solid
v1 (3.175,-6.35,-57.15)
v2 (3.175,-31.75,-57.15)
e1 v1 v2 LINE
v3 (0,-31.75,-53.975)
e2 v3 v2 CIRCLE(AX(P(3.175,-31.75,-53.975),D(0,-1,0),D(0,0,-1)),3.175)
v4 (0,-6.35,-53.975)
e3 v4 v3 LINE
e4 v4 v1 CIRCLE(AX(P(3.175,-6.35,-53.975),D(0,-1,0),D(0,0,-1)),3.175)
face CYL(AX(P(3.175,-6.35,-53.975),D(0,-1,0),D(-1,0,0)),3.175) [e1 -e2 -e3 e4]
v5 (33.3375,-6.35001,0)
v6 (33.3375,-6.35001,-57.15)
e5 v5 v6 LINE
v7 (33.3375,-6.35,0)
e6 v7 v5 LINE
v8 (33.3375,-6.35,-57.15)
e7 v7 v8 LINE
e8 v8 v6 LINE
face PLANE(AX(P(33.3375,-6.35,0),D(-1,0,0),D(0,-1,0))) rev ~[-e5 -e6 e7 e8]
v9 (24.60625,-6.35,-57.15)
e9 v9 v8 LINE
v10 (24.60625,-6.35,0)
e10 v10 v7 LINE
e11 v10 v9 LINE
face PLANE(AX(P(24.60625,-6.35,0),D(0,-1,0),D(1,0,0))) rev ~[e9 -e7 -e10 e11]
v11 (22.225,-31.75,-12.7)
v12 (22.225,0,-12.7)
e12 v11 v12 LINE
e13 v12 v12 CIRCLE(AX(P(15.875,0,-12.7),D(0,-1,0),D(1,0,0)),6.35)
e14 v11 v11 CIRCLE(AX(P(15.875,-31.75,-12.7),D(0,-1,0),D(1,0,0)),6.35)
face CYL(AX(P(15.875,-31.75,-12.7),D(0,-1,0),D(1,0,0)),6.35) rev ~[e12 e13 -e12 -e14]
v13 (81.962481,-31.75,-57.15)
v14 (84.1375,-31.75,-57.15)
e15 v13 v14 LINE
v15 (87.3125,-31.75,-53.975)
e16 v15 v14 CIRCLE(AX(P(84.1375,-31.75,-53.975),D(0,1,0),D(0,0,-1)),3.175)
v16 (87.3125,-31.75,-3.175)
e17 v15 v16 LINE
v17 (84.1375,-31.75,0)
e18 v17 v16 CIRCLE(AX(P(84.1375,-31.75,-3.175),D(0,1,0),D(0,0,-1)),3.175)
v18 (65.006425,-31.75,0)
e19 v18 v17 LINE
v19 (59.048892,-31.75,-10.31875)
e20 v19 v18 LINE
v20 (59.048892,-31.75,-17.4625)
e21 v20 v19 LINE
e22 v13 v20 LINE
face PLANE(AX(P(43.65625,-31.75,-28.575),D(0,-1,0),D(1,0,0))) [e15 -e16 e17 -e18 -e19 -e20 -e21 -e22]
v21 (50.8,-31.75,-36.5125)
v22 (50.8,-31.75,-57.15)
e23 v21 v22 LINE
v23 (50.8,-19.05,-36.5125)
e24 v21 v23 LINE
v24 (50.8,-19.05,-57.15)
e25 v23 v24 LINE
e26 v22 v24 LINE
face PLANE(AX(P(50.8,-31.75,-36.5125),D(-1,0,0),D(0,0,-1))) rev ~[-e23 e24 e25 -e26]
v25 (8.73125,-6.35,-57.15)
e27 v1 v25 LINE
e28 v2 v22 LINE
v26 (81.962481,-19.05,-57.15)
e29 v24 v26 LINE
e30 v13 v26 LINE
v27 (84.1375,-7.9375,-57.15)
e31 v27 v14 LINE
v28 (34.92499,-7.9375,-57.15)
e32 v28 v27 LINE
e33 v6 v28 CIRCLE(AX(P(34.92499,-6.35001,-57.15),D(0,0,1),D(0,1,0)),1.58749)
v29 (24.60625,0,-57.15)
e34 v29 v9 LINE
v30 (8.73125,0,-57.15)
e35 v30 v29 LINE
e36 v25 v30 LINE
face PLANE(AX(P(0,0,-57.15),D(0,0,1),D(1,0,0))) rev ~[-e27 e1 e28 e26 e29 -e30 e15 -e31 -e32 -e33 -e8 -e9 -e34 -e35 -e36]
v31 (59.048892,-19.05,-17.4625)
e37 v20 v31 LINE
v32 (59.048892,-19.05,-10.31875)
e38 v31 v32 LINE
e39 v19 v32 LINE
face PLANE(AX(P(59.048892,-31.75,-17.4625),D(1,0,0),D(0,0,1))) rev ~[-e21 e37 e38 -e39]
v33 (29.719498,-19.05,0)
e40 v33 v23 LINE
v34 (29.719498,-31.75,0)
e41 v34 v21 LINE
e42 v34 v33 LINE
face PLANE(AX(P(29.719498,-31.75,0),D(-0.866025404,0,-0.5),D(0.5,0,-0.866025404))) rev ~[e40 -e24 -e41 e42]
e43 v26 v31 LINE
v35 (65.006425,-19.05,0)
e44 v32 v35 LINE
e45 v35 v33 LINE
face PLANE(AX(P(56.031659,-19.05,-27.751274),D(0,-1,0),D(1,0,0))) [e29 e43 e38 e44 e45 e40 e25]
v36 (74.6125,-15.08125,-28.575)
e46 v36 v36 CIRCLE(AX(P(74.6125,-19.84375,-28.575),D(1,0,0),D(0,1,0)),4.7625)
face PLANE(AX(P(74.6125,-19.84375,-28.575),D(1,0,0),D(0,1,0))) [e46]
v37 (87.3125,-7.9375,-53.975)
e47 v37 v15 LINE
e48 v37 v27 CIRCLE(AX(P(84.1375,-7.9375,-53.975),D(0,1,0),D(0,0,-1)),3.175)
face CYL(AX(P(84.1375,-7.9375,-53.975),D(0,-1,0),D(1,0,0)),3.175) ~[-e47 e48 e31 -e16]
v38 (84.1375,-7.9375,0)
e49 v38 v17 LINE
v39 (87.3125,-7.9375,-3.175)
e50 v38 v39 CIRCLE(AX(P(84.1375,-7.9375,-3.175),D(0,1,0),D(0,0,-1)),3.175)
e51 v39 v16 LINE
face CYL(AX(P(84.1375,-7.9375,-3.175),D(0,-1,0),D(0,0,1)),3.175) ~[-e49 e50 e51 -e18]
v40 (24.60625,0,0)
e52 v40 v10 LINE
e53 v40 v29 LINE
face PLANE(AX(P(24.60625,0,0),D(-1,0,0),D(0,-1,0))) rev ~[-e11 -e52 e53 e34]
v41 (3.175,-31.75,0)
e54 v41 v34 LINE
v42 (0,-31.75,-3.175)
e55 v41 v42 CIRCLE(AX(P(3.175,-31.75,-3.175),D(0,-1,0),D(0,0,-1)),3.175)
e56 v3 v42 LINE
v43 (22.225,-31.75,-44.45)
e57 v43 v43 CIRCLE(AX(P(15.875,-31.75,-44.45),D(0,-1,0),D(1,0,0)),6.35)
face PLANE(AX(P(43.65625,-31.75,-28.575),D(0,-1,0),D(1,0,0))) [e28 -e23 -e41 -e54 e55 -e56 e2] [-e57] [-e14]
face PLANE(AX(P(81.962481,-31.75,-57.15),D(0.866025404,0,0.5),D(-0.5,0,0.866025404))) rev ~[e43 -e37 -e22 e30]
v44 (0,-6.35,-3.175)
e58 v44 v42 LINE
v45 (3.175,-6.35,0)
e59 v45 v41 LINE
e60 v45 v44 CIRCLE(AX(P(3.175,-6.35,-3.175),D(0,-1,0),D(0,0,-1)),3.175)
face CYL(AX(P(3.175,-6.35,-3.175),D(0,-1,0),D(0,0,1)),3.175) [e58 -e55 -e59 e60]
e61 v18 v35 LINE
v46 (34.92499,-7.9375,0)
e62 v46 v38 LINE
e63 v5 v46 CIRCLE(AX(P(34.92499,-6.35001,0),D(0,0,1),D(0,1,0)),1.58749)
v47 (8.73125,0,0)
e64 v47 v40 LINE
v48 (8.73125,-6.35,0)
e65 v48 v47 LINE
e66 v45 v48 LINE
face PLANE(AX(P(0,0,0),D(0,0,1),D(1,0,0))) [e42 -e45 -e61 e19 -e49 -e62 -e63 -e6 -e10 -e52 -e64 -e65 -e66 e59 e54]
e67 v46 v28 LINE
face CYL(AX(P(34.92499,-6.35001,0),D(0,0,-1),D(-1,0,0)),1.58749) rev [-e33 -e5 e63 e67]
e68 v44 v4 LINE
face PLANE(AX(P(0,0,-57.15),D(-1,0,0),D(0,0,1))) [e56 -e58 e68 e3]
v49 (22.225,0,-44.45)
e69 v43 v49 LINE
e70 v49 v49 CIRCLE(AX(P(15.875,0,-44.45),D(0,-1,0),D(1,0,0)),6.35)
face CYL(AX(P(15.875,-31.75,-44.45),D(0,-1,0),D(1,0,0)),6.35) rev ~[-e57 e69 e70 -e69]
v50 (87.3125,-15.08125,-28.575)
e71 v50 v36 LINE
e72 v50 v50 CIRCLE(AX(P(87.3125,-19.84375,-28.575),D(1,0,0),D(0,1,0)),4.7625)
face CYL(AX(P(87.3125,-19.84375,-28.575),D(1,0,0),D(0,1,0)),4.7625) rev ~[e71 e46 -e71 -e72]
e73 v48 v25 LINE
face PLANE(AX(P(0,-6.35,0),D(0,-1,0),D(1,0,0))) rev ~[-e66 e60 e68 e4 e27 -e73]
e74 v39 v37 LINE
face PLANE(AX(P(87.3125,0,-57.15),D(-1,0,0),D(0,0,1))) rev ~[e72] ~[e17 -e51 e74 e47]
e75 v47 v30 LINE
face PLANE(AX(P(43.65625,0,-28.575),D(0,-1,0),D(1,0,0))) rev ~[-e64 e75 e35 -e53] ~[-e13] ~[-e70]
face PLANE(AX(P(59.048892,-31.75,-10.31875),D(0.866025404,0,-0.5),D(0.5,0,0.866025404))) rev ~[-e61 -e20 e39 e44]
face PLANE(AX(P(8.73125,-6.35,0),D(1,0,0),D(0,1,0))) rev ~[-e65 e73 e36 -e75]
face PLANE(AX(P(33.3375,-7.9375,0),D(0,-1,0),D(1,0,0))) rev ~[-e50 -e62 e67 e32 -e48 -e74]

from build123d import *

# Parameters (mm, degrees)
F0_W      = 87.3125
F0_H      = 57.15
F1_DEPTH  = 31.75
F3_DEPTH  = 12.7
F4_W      = 8.73125
F4_H      = 6.35
F5_DEPTH  = 66.294
F6_R      = 1.58749
F7_R      = 3.175
F8_R      = 6.35
F9_DEPTH  = 108.204
F10_R     = 4.7625
F11_DEPTH = 12.7


# Not quite as in the source:
# - a fillet or chamfer is up to 0.001 mm smaller than in the source, because OpenCascade refuses the exact size


with BuildPart() as f1:
    # F0 (on Front) → F1 (new body)
    with BuildSketch(Plane.XZ):
        with Locations((43.65625, -28.575)):
            Rectangle(F0_W, F0_H)
    extrude(amount=F1_DEPTH)

    # F2 (on face) → F3 (cut)
    with BuildSketch(Plane.XZ.offset(31.75)):
        Polygon((50.8, -36.5125), (50.8, -57.15), (81.9624807795, -57.15), (59.048891971, -17.4625), (59.048891971, -10.31875), (65.0064250612, 0), (29.7194982962, 0), align=None)
    extrude(amount=-F3_DEPTH, mode=Mode.SUBTRACT)

    # F4 (on face) → F5 (cut)
    with BuildSketch(Plane.XY):
        Polygon((87.3125, 0), (24.60625, 0), (24.60625, -6.35), (33.3375, -6.35), (33.3375, -7.9375), (87.3125, -7.9375), align=None)
        with Locations((4.365625, -3.175)):
            Rectangle(F4_W, F4_H)
    extrude(amount=-F5_DEPTH, mode=Mode.SUBTRACT)

    # F6 (radius 1.5875 in the source; OpenCascade refuses exactly that, so slightly less here)
    f6_edges = [f1.edges().sort_by_distance(p)[0] for p in [
        (33.3375, -7.9375, -28.575),
    ]]
    fillet(f6_edges, radius=F6_R)

    # F7
    f7_edges = [f1.edges().sort_by_distance(p)[0] for p in [
        (87.3125, -19.84375, 0),
        (0, -19.05, 0),
        (87.3125, -19.84375, -57.15),
        (0, -19.05, -57.15),
    ]]
    fillet(f7_edges, radius=F7_R)

    # F8 (on face) → F9 (cut)
    with BuildSketch(Plane.XZ.offset(31.75)):
        with Locations((15.875, -12.7)):
            Circle(F8_R)
        with Locations((15.875, -44.45)):
            Circle(F8_R)
    extrude(amount=-F9_DEPTH, mode=Mode.SUBTRACT)

    # F10 (on face) → F11 (cut)
    with BuildSketch(Plane.YZ.offset(87.3125)):
        with Locations((-19.84375, -28.575)):
            Circle(F10_R)
    extrude(amount=-F11_DEPTH, mode=Mode.SUBTRACT)


solid = f1.part
